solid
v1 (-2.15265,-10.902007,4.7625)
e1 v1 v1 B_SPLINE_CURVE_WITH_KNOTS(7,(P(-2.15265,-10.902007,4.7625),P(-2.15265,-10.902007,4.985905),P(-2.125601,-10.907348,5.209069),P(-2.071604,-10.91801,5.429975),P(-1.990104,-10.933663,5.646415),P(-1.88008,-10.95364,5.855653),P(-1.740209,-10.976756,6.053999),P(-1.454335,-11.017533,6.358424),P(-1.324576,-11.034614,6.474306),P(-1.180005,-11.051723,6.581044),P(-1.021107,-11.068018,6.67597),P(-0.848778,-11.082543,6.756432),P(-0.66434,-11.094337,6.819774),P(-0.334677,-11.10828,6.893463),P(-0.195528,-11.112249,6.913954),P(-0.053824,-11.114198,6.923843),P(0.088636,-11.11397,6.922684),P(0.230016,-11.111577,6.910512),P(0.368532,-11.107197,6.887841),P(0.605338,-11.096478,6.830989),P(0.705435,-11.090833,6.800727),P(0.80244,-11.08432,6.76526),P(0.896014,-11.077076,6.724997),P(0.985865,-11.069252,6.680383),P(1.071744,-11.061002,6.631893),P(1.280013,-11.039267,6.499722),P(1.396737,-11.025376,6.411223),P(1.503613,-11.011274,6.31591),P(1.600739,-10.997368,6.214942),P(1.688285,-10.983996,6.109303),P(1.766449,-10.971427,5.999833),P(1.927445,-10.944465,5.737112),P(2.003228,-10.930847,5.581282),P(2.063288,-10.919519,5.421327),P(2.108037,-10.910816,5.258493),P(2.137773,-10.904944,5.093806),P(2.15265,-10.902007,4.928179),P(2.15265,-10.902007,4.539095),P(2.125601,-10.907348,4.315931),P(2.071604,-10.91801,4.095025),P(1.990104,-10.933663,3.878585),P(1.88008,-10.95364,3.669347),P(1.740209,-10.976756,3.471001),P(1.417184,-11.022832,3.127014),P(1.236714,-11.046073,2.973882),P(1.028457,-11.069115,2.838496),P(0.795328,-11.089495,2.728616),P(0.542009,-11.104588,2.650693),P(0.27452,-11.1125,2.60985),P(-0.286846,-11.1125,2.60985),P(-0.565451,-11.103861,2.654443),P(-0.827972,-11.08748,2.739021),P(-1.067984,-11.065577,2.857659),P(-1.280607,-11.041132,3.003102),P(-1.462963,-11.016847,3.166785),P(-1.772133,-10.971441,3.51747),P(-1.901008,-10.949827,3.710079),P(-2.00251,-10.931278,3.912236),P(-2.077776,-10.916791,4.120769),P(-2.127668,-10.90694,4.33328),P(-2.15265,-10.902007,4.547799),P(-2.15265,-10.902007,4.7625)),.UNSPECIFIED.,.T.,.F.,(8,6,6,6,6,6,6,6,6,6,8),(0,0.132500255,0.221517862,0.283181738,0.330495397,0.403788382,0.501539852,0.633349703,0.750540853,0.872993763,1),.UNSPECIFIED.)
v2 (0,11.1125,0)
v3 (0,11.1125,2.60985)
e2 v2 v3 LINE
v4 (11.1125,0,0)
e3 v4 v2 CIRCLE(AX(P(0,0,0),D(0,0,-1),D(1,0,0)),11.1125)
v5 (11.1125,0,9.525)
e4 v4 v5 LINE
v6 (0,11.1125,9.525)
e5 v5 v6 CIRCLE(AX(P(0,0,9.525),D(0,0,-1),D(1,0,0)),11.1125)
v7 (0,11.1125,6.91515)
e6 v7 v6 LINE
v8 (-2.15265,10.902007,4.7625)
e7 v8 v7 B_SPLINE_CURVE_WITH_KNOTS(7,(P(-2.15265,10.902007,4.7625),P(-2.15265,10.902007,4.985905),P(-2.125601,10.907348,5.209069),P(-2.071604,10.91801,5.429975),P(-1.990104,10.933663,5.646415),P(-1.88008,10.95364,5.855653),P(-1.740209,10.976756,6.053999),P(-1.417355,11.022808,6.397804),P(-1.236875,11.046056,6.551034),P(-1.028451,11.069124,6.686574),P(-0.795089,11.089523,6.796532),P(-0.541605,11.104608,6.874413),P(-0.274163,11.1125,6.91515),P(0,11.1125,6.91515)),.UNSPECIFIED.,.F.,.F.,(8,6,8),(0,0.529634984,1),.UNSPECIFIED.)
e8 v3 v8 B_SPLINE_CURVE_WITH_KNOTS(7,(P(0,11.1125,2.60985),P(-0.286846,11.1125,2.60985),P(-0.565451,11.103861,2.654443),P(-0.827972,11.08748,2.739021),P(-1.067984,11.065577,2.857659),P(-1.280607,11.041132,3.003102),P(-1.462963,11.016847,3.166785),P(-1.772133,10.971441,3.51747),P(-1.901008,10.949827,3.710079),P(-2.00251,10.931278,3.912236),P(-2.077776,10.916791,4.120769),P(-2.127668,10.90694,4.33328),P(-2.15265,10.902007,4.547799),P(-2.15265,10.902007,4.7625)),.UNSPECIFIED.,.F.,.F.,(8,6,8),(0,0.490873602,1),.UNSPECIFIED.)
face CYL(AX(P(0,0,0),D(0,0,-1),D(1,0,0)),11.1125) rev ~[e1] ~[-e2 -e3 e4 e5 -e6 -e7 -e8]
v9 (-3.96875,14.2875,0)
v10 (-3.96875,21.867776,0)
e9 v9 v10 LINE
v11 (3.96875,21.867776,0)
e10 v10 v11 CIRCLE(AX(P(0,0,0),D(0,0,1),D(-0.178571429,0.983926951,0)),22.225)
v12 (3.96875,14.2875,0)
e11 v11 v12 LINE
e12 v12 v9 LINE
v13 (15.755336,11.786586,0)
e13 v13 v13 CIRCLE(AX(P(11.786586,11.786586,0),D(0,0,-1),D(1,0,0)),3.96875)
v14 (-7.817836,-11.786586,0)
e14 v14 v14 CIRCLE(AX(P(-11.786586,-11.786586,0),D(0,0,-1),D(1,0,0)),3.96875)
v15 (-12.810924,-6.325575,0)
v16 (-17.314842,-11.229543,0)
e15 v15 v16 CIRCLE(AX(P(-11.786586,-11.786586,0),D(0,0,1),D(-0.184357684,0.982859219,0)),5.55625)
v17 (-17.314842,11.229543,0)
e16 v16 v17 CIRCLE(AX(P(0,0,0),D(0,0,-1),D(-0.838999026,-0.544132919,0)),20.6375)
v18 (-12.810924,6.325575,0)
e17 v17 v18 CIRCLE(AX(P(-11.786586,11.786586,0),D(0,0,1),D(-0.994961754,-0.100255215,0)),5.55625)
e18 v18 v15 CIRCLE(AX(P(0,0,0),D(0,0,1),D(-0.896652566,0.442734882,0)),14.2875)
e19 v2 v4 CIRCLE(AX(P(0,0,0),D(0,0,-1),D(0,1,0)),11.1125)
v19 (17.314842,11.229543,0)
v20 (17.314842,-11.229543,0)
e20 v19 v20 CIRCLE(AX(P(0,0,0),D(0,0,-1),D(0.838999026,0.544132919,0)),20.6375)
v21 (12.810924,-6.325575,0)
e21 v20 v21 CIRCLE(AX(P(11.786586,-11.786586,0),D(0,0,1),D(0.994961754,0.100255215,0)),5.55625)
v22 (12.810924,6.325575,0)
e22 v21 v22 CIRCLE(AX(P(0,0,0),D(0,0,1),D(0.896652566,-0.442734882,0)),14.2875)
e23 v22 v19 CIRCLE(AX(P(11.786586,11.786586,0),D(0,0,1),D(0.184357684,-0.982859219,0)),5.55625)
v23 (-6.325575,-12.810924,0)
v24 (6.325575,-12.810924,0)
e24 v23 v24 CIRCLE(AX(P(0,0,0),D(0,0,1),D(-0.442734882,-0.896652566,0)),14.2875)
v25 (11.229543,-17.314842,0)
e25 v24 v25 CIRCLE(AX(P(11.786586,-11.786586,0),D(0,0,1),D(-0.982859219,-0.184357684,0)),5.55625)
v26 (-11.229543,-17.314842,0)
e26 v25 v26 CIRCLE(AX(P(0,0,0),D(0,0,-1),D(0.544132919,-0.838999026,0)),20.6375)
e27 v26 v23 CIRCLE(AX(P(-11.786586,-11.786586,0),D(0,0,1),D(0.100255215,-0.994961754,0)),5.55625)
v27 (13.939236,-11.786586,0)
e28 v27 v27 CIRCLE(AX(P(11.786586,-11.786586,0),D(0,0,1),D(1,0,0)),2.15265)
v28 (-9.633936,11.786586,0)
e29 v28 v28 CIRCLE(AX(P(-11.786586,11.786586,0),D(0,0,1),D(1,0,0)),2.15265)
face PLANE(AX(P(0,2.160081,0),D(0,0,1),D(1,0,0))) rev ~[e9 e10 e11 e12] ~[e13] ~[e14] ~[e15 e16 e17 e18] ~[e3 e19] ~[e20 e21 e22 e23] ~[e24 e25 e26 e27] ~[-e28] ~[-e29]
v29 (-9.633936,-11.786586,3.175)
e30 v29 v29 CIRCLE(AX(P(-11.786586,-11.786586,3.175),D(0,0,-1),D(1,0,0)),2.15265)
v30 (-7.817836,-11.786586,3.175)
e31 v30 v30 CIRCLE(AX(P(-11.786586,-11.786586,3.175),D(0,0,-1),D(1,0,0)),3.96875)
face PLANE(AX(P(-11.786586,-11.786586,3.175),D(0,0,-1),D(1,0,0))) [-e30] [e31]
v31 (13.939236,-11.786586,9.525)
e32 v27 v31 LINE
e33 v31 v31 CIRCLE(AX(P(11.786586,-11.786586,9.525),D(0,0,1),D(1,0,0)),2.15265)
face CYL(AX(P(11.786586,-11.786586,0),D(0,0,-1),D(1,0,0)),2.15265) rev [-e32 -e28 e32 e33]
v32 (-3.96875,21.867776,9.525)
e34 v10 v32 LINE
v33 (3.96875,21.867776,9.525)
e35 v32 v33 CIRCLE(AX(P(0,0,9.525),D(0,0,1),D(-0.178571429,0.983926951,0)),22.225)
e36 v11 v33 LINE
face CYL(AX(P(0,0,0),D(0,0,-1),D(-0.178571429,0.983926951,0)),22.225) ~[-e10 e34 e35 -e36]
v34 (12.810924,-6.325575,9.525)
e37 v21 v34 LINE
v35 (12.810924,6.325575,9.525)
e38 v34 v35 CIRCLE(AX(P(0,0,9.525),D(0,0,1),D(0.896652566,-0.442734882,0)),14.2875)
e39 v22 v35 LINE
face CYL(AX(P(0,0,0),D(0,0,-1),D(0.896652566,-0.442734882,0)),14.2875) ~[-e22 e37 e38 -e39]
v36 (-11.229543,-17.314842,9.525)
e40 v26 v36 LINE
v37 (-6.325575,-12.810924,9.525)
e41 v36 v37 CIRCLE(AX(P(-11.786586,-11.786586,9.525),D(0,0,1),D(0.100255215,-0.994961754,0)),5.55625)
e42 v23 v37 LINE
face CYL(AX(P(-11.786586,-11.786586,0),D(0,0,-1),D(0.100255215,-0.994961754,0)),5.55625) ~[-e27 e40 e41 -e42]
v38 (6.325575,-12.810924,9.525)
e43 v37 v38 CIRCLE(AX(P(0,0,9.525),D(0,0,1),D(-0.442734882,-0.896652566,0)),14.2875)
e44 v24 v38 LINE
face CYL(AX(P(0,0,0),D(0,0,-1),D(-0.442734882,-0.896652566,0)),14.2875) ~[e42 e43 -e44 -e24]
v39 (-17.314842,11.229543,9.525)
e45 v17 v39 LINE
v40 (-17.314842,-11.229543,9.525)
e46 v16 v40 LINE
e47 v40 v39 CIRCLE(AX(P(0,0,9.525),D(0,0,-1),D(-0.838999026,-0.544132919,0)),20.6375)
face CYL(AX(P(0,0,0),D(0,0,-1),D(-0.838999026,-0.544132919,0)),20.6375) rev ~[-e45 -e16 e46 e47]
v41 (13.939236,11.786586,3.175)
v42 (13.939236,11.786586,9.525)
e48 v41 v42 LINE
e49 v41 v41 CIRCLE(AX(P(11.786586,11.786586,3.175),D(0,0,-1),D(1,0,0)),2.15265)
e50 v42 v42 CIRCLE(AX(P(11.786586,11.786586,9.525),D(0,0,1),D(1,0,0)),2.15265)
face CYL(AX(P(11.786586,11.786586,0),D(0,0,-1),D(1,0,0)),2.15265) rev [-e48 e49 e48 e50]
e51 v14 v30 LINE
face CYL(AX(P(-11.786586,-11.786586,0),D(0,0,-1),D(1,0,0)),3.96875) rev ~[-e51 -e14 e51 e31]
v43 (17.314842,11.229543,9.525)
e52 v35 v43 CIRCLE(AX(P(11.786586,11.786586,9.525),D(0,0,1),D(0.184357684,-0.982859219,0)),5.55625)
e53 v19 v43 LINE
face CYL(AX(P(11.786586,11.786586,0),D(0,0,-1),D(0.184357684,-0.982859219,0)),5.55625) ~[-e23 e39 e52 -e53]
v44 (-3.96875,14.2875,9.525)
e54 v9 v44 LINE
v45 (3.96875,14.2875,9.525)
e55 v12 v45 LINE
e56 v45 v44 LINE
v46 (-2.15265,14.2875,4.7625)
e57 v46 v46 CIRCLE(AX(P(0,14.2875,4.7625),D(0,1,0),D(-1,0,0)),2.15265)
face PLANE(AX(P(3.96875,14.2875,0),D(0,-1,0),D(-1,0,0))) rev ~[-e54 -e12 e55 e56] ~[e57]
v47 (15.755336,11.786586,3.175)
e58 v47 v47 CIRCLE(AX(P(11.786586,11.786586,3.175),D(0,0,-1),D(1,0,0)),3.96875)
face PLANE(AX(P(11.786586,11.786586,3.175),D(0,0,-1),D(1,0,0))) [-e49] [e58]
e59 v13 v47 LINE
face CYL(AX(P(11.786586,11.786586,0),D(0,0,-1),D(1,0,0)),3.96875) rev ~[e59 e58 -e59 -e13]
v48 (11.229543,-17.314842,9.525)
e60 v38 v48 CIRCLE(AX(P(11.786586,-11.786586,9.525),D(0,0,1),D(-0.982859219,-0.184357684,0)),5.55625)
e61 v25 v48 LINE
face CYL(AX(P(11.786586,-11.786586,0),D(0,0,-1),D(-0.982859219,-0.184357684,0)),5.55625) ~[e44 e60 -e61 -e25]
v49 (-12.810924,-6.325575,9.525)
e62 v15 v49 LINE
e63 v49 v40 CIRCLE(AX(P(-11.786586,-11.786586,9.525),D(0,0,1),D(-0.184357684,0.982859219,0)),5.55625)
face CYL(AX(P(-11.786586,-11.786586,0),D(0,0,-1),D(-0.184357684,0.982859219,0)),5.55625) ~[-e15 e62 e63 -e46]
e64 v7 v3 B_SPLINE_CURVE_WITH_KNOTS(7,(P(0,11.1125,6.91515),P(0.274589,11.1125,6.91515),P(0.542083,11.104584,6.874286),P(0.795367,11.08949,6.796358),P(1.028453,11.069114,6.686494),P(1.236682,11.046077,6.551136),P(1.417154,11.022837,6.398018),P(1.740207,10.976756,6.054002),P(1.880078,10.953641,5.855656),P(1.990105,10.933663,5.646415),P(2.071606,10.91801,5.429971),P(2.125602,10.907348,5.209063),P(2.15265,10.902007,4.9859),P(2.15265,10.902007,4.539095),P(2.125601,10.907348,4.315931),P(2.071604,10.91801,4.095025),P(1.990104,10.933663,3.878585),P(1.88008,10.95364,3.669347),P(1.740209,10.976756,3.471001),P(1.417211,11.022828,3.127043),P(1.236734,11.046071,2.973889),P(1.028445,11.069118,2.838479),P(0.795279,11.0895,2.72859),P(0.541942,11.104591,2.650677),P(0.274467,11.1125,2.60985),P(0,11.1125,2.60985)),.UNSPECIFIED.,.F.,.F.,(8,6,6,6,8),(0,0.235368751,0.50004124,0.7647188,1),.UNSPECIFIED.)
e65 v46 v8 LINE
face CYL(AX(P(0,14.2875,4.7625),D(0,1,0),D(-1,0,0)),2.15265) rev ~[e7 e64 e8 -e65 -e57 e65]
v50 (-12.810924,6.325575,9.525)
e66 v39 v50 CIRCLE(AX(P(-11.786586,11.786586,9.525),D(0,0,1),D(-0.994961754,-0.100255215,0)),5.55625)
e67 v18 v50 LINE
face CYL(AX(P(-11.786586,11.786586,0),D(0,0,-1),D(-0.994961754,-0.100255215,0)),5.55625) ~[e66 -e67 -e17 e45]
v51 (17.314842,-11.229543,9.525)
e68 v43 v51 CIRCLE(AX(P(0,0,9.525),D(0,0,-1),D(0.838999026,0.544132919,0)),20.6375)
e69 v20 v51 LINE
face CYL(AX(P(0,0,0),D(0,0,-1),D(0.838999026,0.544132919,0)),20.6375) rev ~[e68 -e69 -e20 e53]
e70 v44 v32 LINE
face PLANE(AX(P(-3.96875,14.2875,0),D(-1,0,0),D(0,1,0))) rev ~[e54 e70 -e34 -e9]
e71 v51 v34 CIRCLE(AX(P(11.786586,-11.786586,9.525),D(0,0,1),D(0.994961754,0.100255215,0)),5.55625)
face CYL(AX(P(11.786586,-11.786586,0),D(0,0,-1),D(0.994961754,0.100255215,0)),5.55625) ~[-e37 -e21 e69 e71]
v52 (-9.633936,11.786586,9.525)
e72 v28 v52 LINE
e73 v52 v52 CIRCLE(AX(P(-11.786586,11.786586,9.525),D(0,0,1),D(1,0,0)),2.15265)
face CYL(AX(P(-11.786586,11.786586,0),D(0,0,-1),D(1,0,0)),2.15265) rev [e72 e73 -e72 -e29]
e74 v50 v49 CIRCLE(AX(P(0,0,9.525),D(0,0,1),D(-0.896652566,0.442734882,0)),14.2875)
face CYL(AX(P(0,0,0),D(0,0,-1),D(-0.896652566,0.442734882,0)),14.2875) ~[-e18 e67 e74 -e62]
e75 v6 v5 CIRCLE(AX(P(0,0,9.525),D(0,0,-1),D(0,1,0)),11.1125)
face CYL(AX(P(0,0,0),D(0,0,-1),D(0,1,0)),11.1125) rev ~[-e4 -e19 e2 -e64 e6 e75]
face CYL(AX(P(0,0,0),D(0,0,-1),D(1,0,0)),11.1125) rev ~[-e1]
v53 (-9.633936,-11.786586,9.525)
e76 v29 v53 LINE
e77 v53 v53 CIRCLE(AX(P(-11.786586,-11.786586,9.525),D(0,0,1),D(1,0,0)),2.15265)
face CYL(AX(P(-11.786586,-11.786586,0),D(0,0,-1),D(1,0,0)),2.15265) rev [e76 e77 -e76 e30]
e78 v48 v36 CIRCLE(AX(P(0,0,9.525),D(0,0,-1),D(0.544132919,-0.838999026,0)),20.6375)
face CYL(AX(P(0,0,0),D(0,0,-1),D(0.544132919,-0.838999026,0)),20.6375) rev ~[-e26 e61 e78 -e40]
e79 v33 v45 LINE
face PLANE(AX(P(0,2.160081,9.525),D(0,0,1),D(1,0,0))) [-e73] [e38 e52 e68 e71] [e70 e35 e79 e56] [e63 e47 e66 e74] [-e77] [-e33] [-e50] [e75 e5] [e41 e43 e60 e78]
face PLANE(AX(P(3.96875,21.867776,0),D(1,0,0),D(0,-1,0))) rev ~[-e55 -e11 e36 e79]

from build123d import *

# Parameters (mm, degrees)
F0_R            = 2.15265
F1_DEPTH        = 9.525
F2_R            = 2.15265
F3_REACH        = 42.6021136501
F5_R            = 3.96875
F6_DEPTH        = 3.175
F8_DEPTH        = 9.525
F8_COPIES_COUNT = 3
F8_COPIES_ANGLE = 180


# Not quite as in the source:
# - a pattern or mirror of a feature is missing from the dataset's text; its kind, count and spacing are read off the source's solid


with BuildPart() as f1:
    # F0 (on Top) → F1 (new body)
    with BuildSketch(Plane.XY):
        with BuildLine():
            Line((3.96875, 14.2875), (0, 14.2875))
            Line((0, 14.2875), (-3.96875, 14.2875))
            Line((-3.96875, 14.2875), (-3.96875, 21.8677764859))
            ThreePointArc((-3.96875, 21.8677764859), (0, -22.225), (3.96875, 21.8677764859))
            Line((3.96875, 21.8677764859), (3.96875, 14.2875))
        make_face()
        with Locations((-11.7865861589, -11.7865861589)):
            Circle(F0_R, mode=Mode.SUBTRACT)
        with Locations((11.7865861589, -11.7865861589)):
            Circle(F0_R, mode=Mode.SUBTRACT)
        with Locations((-11.7865861589, 11.7865861589)):
            Circle(F0_R, mode=Mode.SUBTRACT)
        with BuildLine():
            ThreePointArc((0, 11.1125), (7.8577241059, 7.8577241059), (11.1125, 0))
            ThreePointArc((11.1125, 0), (-7.8577241059, -7.8577241059), (0, 11.1125))
        make_face(mode=Mode.SUBTRACT)
        with Locations((11.7865861589, 11.7865861589)):
            Circle(F0_R, mode=Mode.SUBTRACT)
    extrude(amount=F1_DEPTH)

    f3_end = f1.faces().sort_by_distance((0, -11.1125, 4.7625))[0]
    # F2 (on face) → F3 (cut, up to a face of the model that its end follows)
    with BuildSketch(Plane(origin=(0, 14.2875, 0), x_dir=(-1, 0, 0), z_dir=(0, 1, 0))):
        with Locations((0, 4.7625)):
            Circle(F2_R)
    f3_long = extrude(amount=-F3_REACH, mode=Mode.PRIVATE)
    add(split(f3_long, bisect_by=f3_end, keep=Keep.ALL, mode=Mode.PRIVATE).solids().sort_by_distance((0, 14.2875, 4.7625))[0], mode=Mode.SUBTRACT)

    # F5 (on face) → F6 (cut, through all)
    with BuildSketch(Plane(origin=(0, 0, 0), x_dir=(1, 0, 0), z_dir=(0, 0, -1))):
        with Locations((11.7865861589, -11.7865861589)):
            Circle(F5_R)
        with Locations((-11.7865861589, 11.7865861589)):
            Circle(F5_R)
    extrude(amount=-F6_DEPTH, mode=Mode.SUBTRACT)

    # F7 (on face) → F8 (cut, through all)
    with BuildSketch(Plane(origin=(0, 0, 0), x_dir=(1, 0, 0), z_dir=(0, 0, -1))):
        with BuildLine():
            ThreePointArc((-17.3148424047, -11.229543123), (-15.8788163052, -8.0281867), (-12.8109235396, -6.3255746232))
            ThreePointArc((-12.8109235396, -6.3255746232), (-14.2875, 0), (-12.8109235396, 6.3255746232))
            ThreePointArc((-12.8109235396, 6.3255746232), (-15.8788163052, 8.0281867), (-17.3148424047, 11.229543123))
            ThreePointArc((-17.3148424047, 11.229543123), (-20.6375, 0), (-17.3148424047, -11.229543123))
        make_face()
    f8 = extrude(amount=-F8_DEPTH, mode=Mode.SUBTRACT)

    # F8_copies: F8 ×3 about axis
    f8_copies_axis = Axis((0, 0, 0), (0, 0, 1))
    for i in range(1, F8_COPIES_COUNT):
        add(f8.rotate(f8_copies_axis, i * F8_COPIES_ANGLE / (F8_COPIES_COUNT - 1)), mode=Mode.SUBTRACT)


solid = f1.part
